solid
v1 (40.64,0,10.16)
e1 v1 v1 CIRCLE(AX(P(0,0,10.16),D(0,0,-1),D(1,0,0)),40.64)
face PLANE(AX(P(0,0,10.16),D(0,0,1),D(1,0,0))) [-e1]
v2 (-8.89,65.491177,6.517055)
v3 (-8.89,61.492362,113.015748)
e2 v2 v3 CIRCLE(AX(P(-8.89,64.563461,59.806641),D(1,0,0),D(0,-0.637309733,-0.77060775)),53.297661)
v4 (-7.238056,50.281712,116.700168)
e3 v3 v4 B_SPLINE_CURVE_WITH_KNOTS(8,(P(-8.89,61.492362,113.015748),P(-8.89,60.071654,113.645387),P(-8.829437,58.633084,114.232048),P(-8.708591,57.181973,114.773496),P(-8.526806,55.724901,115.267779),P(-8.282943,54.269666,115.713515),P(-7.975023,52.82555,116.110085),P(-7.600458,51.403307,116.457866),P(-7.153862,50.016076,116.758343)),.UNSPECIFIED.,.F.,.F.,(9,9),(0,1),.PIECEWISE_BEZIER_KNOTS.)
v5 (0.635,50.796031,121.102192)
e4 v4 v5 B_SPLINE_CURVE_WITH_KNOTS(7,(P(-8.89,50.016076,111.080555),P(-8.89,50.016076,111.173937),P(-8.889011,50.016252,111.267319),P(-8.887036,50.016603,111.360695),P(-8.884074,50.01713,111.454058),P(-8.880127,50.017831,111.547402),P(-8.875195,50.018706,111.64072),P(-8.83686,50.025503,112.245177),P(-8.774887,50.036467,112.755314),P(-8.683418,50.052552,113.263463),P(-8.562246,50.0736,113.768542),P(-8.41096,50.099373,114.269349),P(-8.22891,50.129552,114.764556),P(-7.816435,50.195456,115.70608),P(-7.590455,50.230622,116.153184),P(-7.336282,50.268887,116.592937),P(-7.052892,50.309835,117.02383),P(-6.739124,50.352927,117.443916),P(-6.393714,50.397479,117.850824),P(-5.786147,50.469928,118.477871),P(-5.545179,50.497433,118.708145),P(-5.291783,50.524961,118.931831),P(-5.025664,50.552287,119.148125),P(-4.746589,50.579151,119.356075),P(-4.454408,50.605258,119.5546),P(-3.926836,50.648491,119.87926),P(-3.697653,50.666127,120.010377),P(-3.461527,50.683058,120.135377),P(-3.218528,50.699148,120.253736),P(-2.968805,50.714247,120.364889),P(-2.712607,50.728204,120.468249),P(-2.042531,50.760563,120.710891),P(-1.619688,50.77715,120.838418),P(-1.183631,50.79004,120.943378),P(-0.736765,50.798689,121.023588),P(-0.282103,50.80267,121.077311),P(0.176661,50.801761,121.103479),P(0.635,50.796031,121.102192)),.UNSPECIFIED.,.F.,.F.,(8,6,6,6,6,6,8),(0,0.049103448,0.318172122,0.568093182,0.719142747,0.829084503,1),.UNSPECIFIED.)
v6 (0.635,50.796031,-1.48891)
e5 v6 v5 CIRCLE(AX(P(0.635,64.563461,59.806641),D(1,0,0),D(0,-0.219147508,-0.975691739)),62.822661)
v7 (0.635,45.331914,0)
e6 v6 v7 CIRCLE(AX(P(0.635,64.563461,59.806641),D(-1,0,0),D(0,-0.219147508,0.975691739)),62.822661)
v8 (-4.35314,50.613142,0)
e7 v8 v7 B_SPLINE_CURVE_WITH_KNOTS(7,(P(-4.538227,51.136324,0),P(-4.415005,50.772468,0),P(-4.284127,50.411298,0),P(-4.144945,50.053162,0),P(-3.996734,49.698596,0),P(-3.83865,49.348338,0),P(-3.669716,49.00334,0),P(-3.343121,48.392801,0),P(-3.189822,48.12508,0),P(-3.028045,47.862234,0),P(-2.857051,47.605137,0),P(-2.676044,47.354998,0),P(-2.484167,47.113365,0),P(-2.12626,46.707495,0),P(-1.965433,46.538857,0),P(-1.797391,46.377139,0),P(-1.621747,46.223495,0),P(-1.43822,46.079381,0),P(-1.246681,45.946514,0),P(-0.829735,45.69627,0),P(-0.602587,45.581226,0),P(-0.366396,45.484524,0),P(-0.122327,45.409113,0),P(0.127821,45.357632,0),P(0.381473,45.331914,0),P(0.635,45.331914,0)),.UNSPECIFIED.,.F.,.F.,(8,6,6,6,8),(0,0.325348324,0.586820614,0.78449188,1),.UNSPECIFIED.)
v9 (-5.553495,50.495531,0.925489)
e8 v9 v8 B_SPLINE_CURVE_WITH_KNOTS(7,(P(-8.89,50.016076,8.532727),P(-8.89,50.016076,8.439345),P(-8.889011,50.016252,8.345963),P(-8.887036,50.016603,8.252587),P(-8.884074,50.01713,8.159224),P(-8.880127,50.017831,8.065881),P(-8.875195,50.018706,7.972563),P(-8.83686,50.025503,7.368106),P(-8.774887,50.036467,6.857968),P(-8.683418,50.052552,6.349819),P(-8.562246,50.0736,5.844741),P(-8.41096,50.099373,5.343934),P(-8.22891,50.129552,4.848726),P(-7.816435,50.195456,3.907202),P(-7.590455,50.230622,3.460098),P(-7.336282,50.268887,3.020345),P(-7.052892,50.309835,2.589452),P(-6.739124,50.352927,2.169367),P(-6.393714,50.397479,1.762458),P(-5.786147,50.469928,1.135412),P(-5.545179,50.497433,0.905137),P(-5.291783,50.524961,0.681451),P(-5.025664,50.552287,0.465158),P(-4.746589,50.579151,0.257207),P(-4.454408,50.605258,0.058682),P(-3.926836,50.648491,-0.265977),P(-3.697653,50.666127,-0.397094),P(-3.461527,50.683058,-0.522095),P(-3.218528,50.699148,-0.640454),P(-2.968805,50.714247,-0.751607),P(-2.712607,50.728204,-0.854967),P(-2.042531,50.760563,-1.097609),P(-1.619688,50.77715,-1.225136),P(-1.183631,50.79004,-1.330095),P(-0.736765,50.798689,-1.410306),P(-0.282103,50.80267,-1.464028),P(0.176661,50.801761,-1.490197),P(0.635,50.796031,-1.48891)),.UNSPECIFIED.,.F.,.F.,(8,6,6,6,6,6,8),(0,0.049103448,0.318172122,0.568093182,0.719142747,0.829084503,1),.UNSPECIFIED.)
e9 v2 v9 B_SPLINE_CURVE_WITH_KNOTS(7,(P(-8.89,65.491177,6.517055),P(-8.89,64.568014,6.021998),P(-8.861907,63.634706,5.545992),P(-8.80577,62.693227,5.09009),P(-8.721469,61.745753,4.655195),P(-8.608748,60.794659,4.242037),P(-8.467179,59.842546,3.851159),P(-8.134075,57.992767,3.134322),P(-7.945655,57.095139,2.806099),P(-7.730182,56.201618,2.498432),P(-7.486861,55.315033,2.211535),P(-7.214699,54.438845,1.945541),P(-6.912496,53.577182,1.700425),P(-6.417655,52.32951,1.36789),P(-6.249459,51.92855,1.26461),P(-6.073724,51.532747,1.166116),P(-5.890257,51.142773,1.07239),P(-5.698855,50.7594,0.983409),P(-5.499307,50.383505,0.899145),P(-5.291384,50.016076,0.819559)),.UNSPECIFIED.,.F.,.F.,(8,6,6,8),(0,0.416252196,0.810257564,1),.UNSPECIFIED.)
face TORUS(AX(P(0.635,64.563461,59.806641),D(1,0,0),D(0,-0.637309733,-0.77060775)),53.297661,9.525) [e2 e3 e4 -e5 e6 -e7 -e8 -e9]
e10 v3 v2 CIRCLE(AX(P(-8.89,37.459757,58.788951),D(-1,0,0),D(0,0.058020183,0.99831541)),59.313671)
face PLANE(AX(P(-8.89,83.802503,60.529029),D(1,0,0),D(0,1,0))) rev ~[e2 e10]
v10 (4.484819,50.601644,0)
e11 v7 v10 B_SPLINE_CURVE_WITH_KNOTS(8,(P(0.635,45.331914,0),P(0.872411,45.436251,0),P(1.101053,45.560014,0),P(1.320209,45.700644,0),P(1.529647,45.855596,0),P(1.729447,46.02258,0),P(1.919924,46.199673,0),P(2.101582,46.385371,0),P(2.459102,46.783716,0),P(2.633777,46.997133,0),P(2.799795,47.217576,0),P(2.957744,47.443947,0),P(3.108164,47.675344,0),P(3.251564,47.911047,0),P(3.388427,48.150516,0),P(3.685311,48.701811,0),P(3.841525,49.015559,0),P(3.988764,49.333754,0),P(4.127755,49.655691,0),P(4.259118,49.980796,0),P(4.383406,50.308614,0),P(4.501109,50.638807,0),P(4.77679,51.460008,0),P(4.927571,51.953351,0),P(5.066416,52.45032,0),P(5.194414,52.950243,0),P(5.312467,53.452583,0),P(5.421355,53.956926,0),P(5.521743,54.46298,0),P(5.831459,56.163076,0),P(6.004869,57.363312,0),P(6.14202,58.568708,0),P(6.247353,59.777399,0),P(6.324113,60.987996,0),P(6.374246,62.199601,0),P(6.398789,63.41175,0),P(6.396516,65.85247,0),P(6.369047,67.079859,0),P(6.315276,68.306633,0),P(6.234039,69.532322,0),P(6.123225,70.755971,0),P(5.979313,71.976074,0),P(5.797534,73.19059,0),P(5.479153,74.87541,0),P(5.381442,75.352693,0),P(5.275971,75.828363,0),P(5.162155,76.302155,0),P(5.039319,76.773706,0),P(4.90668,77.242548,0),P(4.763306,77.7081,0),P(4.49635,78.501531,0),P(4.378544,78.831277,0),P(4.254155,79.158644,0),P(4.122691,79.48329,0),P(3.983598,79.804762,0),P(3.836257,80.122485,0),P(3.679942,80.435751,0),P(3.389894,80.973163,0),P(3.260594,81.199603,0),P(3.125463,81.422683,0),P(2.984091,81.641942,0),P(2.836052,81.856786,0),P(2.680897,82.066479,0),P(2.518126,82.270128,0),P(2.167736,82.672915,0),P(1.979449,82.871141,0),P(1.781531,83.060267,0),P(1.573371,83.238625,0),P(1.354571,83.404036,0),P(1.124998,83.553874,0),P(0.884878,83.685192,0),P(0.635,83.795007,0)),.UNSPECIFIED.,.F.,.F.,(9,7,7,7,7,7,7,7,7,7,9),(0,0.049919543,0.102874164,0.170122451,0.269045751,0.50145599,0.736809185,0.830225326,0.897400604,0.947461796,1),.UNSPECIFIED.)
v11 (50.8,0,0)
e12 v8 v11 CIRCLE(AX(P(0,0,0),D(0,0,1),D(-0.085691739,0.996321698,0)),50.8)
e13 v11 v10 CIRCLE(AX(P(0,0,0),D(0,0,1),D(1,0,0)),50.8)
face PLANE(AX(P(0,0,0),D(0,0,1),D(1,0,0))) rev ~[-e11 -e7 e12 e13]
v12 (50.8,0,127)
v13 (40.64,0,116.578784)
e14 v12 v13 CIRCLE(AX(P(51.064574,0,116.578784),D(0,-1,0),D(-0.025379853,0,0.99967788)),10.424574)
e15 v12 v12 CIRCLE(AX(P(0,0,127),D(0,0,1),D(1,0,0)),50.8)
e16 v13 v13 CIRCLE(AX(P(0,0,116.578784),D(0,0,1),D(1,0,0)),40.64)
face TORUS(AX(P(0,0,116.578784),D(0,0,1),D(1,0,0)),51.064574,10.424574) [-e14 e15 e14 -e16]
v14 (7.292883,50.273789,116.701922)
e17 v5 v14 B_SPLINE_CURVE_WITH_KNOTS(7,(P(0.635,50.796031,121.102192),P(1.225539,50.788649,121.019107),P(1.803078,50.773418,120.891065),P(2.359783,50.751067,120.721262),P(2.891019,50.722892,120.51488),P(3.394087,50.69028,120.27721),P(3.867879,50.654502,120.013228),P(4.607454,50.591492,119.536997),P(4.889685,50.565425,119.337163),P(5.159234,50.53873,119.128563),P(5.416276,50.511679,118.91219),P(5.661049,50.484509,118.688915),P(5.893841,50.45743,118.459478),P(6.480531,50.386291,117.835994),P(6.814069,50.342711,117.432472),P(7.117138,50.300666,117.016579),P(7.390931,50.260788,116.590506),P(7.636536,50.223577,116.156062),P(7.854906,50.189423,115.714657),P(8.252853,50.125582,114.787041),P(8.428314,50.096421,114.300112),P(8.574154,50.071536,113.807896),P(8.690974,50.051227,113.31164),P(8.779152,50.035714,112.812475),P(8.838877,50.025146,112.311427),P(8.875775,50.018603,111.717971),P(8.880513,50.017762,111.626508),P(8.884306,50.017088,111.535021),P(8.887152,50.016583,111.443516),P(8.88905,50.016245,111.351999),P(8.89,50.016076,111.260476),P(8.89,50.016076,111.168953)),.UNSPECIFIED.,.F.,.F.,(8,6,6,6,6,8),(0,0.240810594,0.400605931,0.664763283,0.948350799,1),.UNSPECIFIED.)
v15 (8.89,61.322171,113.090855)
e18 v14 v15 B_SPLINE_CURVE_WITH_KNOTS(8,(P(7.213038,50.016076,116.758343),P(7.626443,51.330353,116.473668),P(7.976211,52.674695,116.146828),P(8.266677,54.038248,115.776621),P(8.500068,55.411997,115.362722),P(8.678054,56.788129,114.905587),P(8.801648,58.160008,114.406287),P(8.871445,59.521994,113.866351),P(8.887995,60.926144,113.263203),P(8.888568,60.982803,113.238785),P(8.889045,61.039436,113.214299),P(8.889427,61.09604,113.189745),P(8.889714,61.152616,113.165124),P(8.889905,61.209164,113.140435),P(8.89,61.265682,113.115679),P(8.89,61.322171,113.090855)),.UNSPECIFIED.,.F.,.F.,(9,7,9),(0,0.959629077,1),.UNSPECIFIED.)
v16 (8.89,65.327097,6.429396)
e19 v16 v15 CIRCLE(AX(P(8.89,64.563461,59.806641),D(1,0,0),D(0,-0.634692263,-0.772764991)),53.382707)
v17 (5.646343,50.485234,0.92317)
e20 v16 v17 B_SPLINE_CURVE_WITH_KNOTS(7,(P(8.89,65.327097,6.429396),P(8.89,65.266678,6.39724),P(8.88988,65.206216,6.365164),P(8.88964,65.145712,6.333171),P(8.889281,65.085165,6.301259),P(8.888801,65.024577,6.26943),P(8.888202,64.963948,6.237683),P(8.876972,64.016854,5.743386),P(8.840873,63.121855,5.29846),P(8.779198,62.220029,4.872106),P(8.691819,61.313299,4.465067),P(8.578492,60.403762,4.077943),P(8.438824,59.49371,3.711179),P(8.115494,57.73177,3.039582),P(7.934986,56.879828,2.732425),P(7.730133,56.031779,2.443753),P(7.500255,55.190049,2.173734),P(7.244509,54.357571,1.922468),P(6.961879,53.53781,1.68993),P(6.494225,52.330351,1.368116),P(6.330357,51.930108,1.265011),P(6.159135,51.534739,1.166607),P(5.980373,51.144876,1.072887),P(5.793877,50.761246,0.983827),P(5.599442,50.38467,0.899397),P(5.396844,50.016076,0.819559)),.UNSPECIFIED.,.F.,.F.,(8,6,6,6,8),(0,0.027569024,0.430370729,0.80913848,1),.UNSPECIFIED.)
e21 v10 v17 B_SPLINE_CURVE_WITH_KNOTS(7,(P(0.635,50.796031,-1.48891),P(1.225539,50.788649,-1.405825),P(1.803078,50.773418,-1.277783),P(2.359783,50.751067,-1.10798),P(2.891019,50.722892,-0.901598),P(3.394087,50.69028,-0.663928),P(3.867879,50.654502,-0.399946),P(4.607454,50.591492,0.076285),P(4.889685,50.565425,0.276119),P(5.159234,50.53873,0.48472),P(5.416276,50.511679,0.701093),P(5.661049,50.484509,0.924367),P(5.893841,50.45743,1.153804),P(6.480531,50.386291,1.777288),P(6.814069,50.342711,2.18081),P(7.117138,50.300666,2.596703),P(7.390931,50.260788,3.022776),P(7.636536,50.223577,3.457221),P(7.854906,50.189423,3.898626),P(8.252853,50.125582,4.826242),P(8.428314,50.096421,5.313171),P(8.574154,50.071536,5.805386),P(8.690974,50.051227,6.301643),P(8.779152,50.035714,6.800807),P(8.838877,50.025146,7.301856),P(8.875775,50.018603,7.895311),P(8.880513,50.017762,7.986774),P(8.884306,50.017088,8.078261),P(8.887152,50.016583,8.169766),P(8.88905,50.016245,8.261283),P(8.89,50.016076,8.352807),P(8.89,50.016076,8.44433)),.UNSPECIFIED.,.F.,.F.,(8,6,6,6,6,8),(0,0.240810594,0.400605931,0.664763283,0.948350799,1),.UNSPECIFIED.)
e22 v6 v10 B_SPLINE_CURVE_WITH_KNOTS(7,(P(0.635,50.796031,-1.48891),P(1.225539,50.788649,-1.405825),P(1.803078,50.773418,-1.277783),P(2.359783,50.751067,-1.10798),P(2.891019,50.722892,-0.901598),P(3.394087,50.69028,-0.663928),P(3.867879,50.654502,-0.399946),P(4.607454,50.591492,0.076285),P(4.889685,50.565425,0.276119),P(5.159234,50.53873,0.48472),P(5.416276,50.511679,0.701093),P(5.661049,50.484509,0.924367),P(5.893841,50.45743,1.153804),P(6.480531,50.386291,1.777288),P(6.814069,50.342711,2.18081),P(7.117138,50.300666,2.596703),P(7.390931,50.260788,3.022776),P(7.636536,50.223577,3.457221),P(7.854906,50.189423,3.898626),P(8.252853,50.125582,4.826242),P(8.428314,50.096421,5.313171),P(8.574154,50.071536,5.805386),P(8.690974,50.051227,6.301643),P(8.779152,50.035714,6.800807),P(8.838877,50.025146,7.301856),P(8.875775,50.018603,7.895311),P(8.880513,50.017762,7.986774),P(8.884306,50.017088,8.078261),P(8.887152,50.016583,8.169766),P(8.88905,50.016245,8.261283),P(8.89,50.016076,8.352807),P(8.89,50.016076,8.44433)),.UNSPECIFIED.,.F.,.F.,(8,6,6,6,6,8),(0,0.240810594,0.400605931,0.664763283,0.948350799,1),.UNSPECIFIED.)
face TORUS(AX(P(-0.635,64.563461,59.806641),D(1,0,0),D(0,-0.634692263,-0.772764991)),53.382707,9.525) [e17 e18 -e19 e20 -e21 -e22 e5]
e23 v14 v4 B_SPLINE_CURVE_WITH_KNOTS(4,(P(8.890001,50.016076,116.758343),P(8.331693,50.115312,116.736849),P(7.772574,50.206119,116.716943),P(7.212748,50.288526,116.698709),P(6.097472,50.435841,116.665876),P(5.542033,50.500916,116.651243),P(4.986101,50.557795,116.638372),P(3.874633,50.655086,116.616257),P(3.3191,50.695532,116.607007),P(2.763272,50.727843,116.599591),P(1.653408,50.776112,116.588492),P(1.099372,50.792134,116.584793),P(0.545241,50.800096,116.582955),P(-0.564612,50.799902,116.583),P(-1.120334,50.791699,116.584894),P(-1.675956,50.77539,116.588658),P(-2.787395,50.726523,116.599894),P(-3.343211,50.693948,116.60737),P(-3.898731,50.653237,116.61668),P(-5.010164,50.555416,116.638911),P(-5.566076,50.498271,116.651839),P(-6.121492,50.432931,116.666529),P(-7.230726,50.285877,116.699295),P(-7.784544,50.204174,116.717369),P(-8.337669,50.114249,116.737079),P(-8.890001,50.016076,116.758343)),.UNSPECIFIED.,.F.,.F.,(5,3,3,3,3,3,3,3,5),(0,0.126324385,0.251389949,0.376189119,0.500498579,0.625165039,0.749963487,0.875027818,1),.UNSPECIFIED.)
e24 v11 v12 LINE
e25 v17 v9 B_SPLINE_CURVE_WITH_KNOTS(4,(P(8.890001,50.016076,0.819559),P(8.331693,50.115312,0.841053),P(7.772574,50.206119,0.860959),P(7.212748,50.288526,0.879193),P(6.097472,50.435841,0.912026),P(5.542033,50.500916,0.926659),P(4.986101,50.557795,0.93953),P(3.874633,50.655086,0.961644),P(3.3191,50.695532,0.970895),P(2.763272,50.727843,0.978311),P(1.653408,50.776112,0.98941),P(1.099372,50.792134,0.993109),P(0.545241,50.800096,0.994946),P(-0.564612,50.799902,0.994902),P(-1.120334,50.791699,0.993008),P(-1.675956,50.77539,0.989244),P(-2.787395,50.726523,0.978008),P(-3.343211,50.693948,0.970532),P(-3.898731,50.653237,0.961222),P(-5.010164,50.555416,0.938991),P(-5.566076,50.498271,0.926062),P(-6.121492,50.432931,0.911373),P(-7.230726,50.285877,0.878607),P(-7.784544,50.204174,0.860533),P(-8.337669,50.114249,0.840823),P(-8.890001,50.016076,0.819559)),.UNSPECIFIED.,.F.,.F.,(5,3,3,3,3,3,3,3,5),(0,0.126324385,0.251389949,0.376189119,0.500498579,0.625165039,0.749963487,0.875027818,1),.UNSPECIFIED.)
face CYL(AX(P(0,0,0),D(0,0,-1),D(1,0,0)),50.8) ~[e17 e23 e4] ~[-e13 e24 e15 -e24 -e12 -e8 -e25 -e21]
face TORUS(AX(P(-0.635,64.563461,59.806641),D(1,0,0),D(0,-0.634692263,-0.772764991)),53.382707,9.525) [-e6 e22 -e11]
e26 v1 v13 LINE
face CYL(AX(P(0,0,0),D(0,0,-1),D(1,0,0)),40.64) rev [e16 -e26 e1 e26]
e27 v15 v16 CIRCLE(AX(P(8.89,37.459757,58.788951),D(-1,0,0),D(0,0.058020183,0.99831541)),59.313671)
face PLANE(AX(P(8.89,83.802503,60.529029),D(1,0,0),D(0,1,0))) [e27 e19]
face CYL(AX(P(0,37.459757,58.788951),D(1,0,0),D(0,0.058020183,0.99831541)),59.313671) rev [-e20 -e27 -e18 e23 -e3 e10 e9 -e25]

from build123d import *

# Parameters (mm, degrees)
F0_R         = 50.8
F1_DEPTH     = 127
F2_T         = -10.16
F5_DEPTH     = 8.89
F6_T4_ANGLE  = 254.7462790776
F6_S5_R      = 50.8
F6_T6_DEPTH  = 89
F6_T11_ANGLE = 254.7462790776
F6_S12_R     = 50.8
F6_T13_DEPTH = 89
F6_T18_ANGLE = 254.7462790776
F6_S19_R     = 50.8
F6_T20_DEPTH = 89
F7_T4_ANGLE  = 254.3575983754
F7_S5_R      = 50.8
F7_T6_DEPTH  = 89
F7_T10_ANGLE = 254.3575983754


# Not quite as in the source:
# - a fillet or chamfer that OpenCascade refuses, or shapes differently, is made with other operations: its cross-section is extruded or revolved along the edge and cut away or added


with BuildPart() as f1:
    # F0 (on Top) → F1 (new body)
    with BuildSketch(Plane.XY):
        Circle(F0_R)
    extrude(amount=F1_DEPTH)

    # F2
    f2_openings = [f1.faces().sort_by_distance(p)[0] for p in [
        (0, 0, 127),
    ]]
    offset(amount=F2_T, openings=f2_openings)

    # F3: fillet of radius 10.4245741623 on 1 edges, made by hand

    # F3_s1 → F3_t2 (revolve, cut)
    with BuildSketch(Plane.XZ):
        with BuildLine():
            ThreePointArc((50.8, 127), (43.6003320895, 123.8559286261), (40.64, 116.5787838052))
            Line((40.64, 116.5787838052), (40.64, 127))
            Line((40.64, 127), (50.8, 127))
        make_face()
    revolve(axis=Axis((0, 0, 127), (0, 0, 1)), mode=Mode.SUBTRACT)

    # F4 (on Right) → F5 (join, symmetric)
    with BuildSketch(Plane.YZ):
        with BuildLine():
            ThreePointArc((40.9011468769, 118.0027031276), (96.7316605485, 61.0144931984), (45.3319139779, 0))
            ThreePointArc((45.3319139779, 0), (127.3418829144, 62.1638462438), (40.9011468769, 118.0027031276))
        make_face()
    extrude(amount=F5_DEPTH, both=True)

    # F6: fillet of radius 9.525 on 1 edges, made by hand


with BuildPart() as f6_tool2:
    # F6_s3 → F6_t4 (revolve)
    with BuildSketch(Plane(origin=(0, 8.968139316, -7.4168504874), x_dir=(1, 0, 0), z_dir=(0, -0.7706077503, 0.6373097325))):
        with BuildLine():
            ThreePointArc((-8.89, 33.9367221949), (-6.1001920908, 27.2015301041), (0.635, 24.4117221949))
            Line((0.635, 24.4117221949), (-8.89, 24.4117221949))
            Line((-8.89, 24.4117221949), (-8.89, 33.9367221949))
        make_face()
    revolve(axis=Axis((-8.89, 64.5634606481, 59.8066411912), (1, 0, 0)), revolution_arc=F6_T4_ANGLE)

    # F6_s5 → F6_t6 (intersect, symmetric)
    with BuildSketch(Plane.XY.offset(59.8)):
        Circle(F6_S5_R)
    extrude(amount=F6_T6_DEPTH, both=True, mode=Mode.INTERSECT)

    split(bisect_by=Plane.XY, keep=Keep.BOTTOM)


with BuildPart() as f1_1:
    add(f1.part)

    # F6_t1: cut F6_tool2
    add(f6_tool2.part, mode=Mode.SUBTRACT)


with BuildPart() as f6_tool9:
    # F6_s10 → F6_t11 (revolve)
    with BuildSketch(Plane(origin=(0, 8.968139316, -7.4168504874), x_dir=(1, 0, 0), z_dir=(0, -0.7706077503, 0.6373097325))):
        with BuildLine():
            ThreePointArc((-8.89, 33.9367221949), (-6.1001920908, 27.2015301041), (0.635, 24.4117221949))
            Line((0.635, 24.4117221949), (-8.89, 24.4117221949))
            Line((-8.89, 24.4117221949), (-8.89, 33.9367221949))
        make_face()
    revolve(axis=Axis((-8.89, 64.5634606481, 59.8066411912), (1, 0, 0)), revolution_arc=F6_T11_ANGLE)

    # F6_s12 → F6_t13 (cut, symmetric)
    with BuildSketch(Plane.XY.offset(59.8)):
        Circle(F6_S12_R)
    extrude(amount=F6_T13_DEPTH, both=True, mode=Mode.SUBTRACT)

    split(bisect_by=Plane.XY, keep=Keep.TOP)


with BuildPart() as f1_2:
    add(f1_1.part)

    # F6_t8: cut F6_tool9
    add(f6_tool9.part, mode=Mode.SUBTRACT)


with BuildPart() as f6_tool16:
    # F6_s17 → F6_t18 (revolve)
    with BuildSketch(Plane(origin=(0, 8.968139316, -7.4168504874), x_dir=(1, 0, 0), z_dir=(0, -0.7706077503, 0.6373097325))):
        with BuildLine():
            ThreePointArc((-8.89, 33.9367221949), (-6.1001920908, 27.2015301041), (0.635, 24.4117221949))
            Line((0.635, 24.4117221949), (-8.89, 24.4117221949))
            Line((-8.89, 24.4117221949), (-8.89, 33.9367221949))
        make_face()
    revolve(axis=Axis((-8.89, 64.5634606481, 59.8066411912), (1, 0, 0)), revolution_arc=F6_T18_ANGLE)

    # F6_s19 → F6_t20 (cut, symmetric)
    with BuildSketch(Plane.XY.offset(59.8)):
        Circle(F6_S19_R)
    extrude(amount=F6_T20_DEPTH, both=True, mode=Mode.SUBTRACT)

    split(bisect_by=Plane.XY, keep=Keep.BOTTOM)


with BuildPart() as f1_3:
    add(f1_2.part)

    # F6_t15: cut F6_tool16
    add(f6_tool16.part, mode=Mode.SUBTRACT)

    # F7: fillet of radius 9.525 on 1 edges, made by hand


with BuildPart() as f7_tool2:
    # F7_s3 → F7_t4 (revolve)
    with BuildSketch(Plane(origin=(0, 9.2218448194, -7.5741443116), x_dir=(1, 0, 0), z_dir=(0, -0.7727649908, 0.6346922632))):
        with BuildLine():
            ThreePointArc((0.635, 24.3717466269), (6.5351595171, 27.541577675), (8.89, 33.8117002814))
            Line((8.89, 33.8117002814), (8.89, 24.3717466269))
            Line((8.89, 24.3717466269), (0.635, 24.3717466269))
        make_face()
    revolve(axis=Axis((8.89, 64.5634606481, 59.8066411912), (1, 0, 0)), revolution_arc=F7_T4_ANGLE)

    # F7_s5 → F7_t6 (cut, symmetric)
    with BuildSketch(Plane.XY.offset(59.8)):
        Circle(F7_S5_R)
    extrude(amount=F7_T6_DEPTH, both=True, mode=Mode.SUBTRACT)


with BuildPart() as f1_4:
    add(f1_3.part)

    # F7_t1: cut F7_tool2
    add(f7_tool2.part, mode=Mode.SUBTRACT)


with BuildPart() as f7_tool8:
    # F7_s9 → F7_t10 (revolve)
    with BuildSketch(Plane(origin=(0, 9.2218448194, -7.5741443116), x_dir=(1, 0, 0), z_dir=(0, -0.7727649908, 0.6346922632))):
        with BuildLine():
            ThreePointArc((0.635, 24.3717466269), (6.5351595171, 27.541577675), (8.89, 33.8117002814))
            Line((8.89, 33.8117002814), (8.89, 24.3717466269))
            Line((8.89, 24.3717466269), (0.635, 24.3717466269))
        make_face()
    revolve(axis=Axis((8.89, 64.5634606481, 59.8066411912), (1, 0, 0)), revolution_arc=F7_T10_ANGLE)

    split(bisect_by=Plane.XY, keep=Keep.BOTTOM)


with BuildPart() as f1_5:
    add(f1_4.part)

    # F7_t7: cut F7_tool8
    add(f7_tool8.part, mode=Mode.SUBTRACT)


solid = f1_5.part
